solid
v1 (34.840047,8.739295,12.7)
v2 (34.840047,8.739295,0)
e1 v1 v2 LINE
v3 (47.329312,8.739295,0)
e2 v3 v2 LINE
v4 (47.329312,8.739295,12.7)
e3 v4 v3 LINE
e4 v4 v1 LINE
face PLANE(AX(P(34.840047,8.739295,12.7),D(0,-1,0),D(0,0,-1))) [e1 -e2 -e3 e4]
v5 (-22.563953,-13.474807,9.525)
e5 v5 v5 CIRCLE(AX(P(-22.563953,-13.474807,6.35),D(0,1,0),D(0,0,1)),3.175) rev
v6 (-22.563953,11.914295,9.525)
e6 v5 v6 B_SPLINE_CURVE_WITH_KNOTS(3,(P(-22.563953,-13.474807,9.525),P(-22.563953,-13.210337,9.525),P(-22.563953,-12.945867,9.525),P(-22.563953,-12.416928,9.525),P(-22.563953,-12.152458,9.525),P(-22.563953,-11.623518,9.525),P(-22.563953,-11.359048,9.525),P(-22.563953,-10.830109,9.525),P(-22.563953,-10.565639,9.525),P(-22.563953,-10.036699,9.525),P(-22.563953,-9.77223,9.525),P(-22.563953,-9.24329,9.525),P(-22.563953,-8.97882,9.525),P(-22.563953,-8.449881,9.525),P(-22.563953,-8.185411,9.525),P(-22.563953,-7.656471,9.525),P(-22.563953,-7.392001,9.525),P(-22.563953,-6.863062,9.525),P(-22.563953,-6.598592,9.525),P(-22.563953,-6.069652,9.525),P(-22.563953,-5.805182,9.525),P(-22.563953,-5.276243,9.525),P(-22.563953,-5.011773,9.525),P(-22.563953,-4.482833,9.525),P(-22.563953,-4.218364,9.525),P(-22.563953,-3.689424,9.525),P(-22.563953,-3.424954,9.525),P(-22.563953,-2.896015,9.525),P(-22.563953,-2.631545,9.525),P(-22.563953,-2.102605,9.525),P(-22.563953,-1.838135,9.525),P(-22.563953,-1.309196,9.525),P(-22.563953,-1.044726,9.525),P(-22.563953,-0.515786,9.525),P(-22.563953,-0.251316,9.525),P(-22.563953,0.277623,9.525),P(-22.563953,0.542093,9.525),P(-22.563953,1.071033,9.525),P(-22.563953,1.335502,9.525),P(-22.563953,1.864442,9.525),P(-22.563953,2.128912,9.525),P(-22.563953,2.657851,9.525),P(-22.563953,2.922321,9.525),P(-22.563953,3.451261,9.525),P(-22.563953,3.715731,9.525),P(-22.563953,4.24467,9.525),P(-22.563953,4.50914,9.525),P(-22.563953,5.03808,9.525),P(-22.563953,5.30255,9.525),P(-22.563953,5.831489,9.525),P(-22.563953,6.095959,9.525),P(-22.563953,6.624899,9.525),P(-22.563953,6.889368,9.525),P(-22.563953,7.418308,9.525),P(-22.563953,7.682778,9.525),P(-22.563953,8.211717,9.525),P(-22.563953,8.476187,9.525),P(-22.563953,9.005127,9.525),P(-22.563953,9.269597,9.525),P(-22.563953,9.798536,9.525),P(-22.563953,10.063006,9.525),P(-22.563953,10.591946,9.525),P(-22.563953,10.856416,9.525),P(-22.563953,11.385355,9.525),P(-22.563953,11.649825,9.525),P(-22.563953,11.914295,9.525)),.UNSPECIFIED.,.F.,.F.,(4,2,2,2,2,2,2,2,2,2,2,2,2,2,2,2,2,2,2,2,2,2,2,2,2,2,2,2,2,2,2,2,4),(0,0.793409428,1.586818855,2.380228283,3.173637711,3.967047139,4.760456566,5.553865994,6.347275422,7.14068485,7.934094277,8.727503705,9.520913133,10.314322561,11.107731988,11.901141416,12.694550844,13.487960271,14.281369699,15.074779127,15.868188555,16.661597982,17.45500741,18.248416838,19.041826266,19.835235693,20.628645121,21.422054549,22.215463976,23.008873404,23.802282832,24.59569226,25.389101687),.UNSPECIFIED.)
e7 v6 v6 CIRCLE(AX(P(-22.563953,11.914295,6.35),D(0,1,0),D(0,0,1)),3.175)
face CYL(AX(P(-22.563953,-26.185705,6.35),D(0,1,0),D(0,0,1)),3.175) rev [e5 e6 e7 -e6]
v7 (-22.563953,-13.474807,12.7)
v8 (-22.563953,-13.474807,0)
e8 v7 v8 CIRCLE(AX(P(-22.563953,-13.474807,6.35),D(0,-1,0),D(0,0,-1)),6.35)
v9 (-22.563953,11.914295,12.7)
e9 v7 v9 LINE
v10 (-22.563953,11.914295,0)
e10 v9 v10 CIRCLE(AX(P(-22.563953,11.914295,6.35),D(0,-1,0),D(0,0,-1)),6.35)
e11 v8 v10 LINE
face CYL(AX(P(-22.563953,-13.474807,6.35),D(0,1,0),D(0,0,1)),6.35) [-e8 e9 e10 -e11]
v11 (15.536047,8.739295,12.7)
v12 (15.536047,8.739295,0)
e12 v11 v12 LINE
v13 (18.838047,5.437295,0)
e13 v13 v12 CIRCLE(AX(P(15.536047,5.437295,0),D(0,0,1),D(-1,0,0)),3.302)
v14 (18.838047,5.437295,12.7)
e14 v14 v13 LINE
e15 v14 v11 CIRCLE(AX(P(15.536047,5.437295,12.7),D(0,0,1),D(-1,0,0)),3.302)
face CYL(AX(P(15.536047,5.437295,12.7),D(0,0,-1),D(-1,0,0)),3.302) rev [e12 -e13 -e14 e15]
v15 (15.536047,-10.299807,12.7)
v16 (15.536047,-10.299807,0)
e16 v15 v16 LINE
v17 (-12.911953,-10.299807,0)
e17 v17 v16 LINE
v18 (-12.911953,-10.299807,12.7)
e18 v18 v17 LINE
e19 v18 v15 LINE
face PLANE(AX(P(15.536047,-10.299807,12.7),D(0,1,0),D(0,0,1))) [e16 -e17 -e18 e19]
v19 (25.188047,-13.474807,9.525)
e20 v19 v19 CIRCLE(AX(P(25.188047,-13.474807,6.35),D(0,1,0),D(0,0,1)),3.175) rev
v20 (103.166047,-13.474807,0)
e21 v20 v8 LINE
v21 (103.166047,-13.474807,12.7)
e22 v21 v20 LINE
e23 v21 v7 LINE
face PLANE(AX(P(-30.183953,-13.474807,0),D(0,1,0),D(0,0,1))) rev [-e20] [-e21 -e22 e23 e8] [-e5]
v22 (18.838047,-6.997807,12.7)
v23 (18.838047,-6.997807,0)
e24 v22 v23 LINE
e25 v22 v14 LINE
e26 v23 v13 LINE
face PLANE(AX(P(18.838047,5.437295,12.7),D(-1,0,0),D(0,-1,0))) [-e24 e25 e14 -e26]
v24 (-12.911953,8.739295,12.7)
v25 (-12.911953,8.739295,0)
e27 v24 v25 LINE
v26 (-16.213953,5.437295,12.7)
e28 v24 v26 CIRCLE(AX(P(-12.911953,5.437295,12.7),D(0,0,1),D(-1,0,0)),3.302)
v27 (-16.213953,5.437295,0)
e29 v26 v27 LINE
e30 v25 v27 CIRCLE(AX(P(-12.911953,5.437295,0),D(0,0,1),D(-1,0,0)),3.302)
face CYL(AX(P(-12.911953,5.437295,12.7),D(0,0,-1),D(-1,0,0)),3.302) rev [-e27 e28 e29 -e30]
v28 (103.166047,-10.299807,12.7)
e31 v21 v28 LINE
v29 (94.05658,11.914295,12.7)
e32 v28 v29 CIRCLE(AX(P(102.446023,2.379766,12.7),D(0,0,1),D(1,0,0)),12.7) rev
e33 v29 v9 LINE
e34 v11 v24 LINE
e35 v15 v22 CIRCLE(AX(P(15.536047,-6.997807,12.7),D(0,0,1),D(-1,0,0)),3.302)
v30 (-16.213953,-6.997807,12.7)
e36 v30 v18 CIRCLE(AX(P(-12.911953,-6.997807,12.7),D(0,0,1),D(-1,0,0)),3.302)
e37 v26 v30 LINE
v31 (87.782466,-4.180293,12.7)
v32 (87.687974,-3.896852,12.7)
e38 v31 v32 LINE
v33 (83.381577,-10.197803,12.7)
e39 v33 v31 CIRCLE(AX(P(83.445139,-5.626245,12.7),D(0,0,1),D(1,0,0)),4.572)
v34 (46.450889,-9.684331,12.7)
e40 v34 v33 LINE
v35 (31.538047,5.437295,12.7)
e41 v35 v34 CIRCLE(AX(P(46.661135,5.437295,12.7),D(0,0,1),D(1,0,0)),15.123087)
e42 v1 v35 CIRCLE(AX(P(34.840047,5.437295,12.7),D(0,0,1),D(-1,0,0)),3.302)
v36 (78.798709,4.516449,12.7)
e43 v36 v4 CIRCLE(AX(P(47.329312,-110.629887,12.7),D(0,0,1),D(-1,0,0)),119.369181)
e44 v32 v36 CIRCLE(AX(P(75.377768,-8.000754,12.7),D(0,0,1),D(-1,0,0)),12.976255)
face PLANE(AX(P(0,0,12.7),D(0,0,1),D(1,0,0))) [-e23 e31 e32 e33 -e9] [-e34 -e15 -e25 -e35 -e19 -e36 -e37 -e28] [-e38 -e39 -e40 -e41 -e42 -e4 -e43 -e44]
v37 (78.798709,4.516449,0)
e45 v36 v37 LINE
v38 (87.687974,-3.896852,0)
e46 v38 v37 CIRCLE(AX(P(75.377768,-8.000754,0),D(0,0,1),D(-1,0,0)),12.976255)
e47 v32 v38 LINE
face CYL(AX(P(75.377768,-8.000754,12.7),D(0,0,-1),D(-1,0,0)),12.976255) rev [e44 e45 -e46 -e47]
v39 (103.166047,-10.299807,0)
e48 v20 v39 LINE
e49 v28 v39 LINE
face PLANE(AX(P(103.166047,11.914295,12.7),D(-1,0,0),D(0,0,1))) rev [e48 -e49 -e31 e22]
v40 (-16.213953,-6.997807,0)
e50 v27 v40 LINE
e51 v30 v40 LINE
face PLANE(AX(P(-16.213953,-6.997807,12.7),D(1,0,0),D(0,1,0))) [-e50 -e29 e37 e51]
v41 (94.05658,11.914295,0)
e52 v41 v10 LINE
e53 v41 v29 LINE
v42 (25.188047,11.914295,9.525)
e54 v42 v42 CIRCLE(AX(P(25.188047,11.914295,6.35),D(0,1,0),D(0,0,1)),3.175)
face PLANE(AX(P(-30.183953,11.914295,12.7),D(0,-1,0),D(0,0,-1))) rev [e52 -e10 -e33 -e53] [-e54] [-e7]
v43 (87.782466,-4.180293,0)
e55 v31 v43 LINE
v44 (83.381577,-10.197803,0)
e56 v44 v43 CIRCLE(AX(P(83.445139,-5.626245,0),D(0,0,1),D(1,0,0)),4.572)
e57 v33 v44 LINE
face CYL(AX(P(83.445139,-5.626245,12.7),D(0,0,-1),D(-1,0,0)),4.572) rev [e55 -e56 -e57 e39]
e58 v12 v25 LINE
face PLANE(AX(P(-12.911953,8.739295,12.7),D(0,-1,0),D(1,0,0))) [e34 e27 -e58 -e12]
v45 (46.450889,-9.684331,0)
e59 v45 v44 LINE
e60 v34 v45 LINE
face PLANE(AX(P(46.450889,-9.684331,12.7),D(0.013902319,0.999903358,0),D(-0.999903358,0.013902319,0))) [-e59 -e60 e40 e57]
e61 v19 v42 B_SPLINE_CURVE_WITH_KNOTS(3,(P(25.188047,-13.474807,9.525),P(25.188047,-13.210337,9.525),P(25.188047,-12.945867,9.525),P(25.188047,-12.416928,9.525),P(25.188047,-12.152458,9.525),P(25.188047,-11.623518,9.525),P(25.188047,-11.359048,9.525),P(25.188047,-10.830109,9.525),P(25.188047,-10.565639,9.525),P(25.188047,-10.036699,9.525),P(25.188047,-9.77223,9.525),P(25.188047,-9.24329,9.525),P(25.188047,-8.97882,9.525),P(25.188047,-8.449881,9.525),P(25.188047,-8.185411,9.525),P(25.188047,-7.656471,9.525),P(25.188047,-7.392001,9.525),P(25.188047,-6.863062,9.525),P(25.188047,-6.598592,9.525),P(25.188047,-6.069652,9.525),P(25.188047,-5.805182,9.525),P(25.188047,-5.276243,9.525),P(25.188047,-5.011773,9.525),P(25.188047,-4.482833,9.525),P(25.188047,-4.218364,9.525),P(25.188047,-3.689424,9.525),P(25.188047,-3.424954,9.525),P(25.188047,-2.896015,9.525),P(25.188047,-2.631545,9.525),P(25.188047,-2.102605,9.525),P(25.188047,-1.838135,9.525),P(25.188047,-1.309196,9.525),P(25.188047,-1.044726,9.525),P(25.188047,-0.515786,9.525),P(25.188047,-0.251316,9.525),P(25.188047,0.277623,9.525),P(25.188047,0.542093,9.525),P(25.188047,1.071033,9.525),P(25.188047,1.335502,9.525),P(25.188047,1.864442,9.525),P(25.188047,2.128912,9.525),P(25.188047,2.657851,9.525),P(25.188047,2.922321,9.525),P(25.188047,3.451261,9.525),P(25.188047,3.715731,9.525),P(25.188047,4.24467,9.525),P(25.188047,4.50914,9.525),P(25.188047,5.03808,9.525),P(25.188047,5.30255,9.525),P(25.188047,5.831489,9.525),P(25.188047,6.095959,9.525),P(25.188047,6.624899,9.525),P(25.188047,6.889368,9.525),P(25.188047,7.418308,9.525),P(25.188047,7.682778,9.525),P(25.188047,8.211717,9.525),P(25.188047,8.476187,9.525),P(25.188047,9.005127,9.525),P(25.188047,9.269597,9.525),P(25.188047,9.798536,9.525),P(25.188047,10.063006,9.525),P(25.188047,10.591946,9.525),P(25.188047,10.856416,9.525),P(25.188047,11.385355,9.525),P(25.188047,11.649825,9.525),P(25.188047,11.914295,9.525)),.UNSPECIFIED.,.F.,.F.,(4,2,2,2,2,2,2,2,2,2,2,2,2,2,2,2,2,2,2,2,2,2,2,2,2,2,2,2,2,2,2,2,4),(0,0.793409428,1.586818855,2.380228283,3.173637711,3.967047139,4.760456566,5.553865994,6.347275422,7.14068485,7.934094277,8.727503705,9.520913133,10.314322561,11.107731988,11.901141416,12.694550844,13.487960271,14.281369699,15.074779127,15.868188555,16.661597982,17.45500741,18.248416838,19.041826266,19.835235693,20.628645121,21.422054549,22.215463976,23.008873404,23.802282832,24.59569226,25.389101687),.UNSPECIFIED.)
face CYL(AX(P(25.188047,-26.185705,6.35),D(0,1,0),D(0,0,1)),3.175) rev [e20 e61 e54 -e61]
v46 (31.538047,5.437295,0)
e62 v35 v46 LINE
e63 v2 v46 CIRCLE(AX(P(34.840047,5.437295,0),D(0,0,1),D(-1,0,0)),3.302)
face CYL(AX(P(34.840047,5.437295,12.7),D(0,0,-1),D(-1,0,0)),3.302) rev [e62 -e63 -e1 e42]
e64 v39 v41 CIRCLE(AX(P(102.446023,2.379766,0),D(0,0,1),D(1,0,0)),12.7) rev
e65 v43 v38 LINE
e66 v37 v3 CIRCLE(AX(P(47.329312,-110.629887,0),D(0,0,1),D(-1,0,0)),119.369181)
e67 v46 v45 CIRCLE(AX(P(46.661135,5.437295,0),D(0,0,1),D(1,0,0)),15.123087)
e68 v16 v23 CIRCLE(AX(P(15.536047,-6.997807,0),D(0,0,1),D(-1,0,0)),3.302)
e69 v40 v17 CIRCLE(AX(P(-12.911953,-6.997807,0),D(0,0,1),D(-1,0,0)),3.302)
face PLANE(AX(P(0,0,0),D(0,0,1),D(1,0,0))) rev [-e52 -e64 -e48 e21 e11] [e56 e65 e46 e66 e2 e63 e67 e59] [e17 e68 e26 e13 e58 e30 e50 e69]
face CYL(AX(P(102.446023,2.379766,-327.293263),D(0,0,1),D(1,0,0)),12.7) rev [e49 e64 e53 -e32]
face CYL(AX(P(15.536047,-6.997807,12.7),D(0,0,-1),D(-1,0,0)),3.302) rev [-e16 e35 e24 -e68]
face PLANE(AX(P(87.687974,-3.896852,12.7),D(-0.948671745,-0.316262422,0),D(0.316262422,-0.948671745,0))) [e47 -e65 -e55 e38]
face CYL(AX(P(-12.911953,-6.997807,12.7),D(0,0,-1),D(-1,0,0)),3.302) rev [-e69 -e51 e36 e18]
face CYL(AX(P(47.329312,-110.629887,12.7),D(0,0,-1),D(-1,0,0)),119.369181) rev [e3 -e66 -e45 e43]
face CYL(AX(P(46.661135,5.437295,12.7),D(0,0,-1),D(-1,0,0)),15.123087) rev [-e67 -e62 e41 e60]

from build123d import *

# Parameters (mm, degrees)
SKETCH1_W           = 133.35
SKETCH1_H           = 38.1
BOSS_EXTRUDE1_DEPTH = 12.7
SKETCH2_R           = 3.175
CUT_EXTRUDE1_DEPTH  = 111.707422131
CAVITY1_DEPTH       = 12.7
CUT_EXTRUDE2_DEPTH  = 108.192417986
CUT_EXTRUDE4_DEPTH  = 108.192417986
CUT_EXTRUDE6_DEPTH  = 108.000606538
CUT_EXTRUDE7_DEPTH  = 105.814568341


# Read off the part's stored shape, not the designer's step: Cavity1
with BuildPart() as part:
    # Sketch1 → Boss-Extrude1 (new body)
    with BuildSketch(Plane.XY):
        with Locations((36.491047297, -7.135705236)):
            Rectangle(SKETCH1_W, SKETCH1_H)
    extrude(amount=BOSS_EXTRUDE1_DEPTH)

    # Sketch2 → Cut-Extrude1 (cut, through all)
    with BuildSketch(Plane(origin=(0, 11.914294764, 0), x_dir=(1, 0, 0), z_dir=(0, 1, 0))):
        with Locations(Location((-22.563952703, -6.35, 0), (0, 0, 270))):
            Circle(SKETCH2_R)
        with Locations(Location((25.188047297, -6.35, 0), (0, 0, 270))):
            Circle(SKETCH2_R)
    extrude(amount=-CUT_EXTRUDE1_DEPTH, mode=Mode.SUBTRACT)

    # Cavity1 outline → Cavity1 (cut)
    with BuildSketch(Plane.XY):
        with BuildLine():
            Line((96.096303093, 11.914294764), (94.056580093, 11.914294764))
            ThreePointArc((94.056580093, 11.914294764), (90.695637122, -2.438784083), (103.166047297, -10.299806924))
            Line((103.166047297, -10.299806924), (103.166047297, -9.052983376))
            ThreePointArc((103.166047297, -9.052983376), (91.591067883, -1.280306677), (96.096303093, 11.914294764))
        make_face()
    extrude(amount=CAVITY1_DEPTH, mode=Mode.SUBTRACT)

    # Sketch4 → Cut-Extrude2 (cut, through all)
    with BuildSketch(Plane(origin=(0, 0, 0), x_dir=(-1, 0, 0), z_dir=(0, 0, -1))):
        Polygon((-103.836015624, 12.337344095), (-103.707966328, -9.632256534), (-101.439664514, -9.485914481), (-98.220139359, -8.863960758), (-94.579880804, -6.924928563), (-91.031086031, -2.168811857), (-90.317668525, 2.879988954), (-91.085877767, 6.8566015), (-93.116460279, 9.831236447), (-96.207936138, 13.398323976), align=None)
    extrude(amount=-CUT_EXTRUDE2_DEPTH, mode=Mode.SUBTRACT)

    # Sketch9 → Cut-Extrude4 (cut, through all)
    with BuildSketch(Plane.XY.offset(12.7)):
        Polygon((-30.183952703, -13.474806924), (119.048045807, -13.474806924), (119.048045807, -32.591302601), (-30.183952703, -32.591302601), (-44.866857433, -32.591302601), (-44.866857433, 12.516766533), (-30.183952703, 12.516766533), align=None)
    extrude(amount=-CUT_EXTRUDE4_DEPTH, mode=Mode.SUBTRACT)

    # Sketch11 → Cut-Extrude6 (cut, through all)
    with BuildSketch(Plane(origin=(0, 11.914294764, 0), x_dir=(1, 0, 0), z_dir=(0, 1, 0))):
        with BuildLine():
            Line((-22.563952703, 0), (-30.183952703, 0))
            Line((-30.183952703, 0), (-30.183952703, -12.7))
            Line((-30.183952703, -12.7), (-22.563952703, -12.7))
            ThreePointArc((-22.563952703, -12.7), (-28.913952703, -6.35), (-22.563952703, 0))
        make_face()
    extrude(amount=-CUT_EXTRUDE6_DEPTH, mode=Mode.SUBTRACT)

    # Sketch12 → Cut-Extrude7 (cut, through all)
    with BuildSketch(Plane.XY):
        with BuildLine():
            Line((34.840047297, 8.739294764), (47.329311848, 8.739294764))
            ThreePointArc((47.329311848, 8.739294764), (63.205042995, 7.678873093), (78.798708551, 4.516448692))
            ThreePointArc((78.798708551, 4.516448692), (84.297585987, 1.423684462), (87.687974389, -3.896852177))
            Line((87.687974389, -3.896852177), (87.782466122, -4.180292862))
            ThreePointArc((87.782466122, -4.180292862), (87.135514906, -8.32519055), (83.381577499, -10.197802807))
            Line((83.381577499, -10.197802807), (46.450888554, -9.684330956))
            ThreePointArc((46.450888554, -9.684330956), (35.893420387, -5.181749435), (31.538047297, 5.437294764))
            ThreePointArc((31.538047297, 5.437294764), (32.505180706, 7.772161355), (34.840047297, 8.739294764))
        make_face()
        with BuildLine():
            Line((18.838047297, 5.437294764), (18.838047297, -6.997806924))
            ThreePointArc((18.838047297, -6.997806924), (17.870913889, -9.332673515), (15.536047297, -10.299806924))
            Line((15.536047297, -10.299806924), (-12.911952703, -10.299806924))
            ThreePointArc((-12.911952703, -10.299806924), (-15.246819294, -9.332673515), (-16.213952703, -6.997806924))
            Line((-16.213952703, -6.997806924), (-16.213952703, 5.437294764))
            ThreePointArc((-16.213952703, 5.437294764), (-15.246819294, 7.772161355), (-12.911952703, 8.739294764))
            Line((-12.911952703, 8.739294764), (15.536047297, 8.739294764))
            ThreePointArc((15.536047297, 8.739294764), (17.870913889, 7.772161355), (18.838047297, 5.437294764))
        make_face()
    extrude(amount=CUT_EXTRUDE7_DEPTH, mode=Mode.SUBTRACT)


solid = part.part
